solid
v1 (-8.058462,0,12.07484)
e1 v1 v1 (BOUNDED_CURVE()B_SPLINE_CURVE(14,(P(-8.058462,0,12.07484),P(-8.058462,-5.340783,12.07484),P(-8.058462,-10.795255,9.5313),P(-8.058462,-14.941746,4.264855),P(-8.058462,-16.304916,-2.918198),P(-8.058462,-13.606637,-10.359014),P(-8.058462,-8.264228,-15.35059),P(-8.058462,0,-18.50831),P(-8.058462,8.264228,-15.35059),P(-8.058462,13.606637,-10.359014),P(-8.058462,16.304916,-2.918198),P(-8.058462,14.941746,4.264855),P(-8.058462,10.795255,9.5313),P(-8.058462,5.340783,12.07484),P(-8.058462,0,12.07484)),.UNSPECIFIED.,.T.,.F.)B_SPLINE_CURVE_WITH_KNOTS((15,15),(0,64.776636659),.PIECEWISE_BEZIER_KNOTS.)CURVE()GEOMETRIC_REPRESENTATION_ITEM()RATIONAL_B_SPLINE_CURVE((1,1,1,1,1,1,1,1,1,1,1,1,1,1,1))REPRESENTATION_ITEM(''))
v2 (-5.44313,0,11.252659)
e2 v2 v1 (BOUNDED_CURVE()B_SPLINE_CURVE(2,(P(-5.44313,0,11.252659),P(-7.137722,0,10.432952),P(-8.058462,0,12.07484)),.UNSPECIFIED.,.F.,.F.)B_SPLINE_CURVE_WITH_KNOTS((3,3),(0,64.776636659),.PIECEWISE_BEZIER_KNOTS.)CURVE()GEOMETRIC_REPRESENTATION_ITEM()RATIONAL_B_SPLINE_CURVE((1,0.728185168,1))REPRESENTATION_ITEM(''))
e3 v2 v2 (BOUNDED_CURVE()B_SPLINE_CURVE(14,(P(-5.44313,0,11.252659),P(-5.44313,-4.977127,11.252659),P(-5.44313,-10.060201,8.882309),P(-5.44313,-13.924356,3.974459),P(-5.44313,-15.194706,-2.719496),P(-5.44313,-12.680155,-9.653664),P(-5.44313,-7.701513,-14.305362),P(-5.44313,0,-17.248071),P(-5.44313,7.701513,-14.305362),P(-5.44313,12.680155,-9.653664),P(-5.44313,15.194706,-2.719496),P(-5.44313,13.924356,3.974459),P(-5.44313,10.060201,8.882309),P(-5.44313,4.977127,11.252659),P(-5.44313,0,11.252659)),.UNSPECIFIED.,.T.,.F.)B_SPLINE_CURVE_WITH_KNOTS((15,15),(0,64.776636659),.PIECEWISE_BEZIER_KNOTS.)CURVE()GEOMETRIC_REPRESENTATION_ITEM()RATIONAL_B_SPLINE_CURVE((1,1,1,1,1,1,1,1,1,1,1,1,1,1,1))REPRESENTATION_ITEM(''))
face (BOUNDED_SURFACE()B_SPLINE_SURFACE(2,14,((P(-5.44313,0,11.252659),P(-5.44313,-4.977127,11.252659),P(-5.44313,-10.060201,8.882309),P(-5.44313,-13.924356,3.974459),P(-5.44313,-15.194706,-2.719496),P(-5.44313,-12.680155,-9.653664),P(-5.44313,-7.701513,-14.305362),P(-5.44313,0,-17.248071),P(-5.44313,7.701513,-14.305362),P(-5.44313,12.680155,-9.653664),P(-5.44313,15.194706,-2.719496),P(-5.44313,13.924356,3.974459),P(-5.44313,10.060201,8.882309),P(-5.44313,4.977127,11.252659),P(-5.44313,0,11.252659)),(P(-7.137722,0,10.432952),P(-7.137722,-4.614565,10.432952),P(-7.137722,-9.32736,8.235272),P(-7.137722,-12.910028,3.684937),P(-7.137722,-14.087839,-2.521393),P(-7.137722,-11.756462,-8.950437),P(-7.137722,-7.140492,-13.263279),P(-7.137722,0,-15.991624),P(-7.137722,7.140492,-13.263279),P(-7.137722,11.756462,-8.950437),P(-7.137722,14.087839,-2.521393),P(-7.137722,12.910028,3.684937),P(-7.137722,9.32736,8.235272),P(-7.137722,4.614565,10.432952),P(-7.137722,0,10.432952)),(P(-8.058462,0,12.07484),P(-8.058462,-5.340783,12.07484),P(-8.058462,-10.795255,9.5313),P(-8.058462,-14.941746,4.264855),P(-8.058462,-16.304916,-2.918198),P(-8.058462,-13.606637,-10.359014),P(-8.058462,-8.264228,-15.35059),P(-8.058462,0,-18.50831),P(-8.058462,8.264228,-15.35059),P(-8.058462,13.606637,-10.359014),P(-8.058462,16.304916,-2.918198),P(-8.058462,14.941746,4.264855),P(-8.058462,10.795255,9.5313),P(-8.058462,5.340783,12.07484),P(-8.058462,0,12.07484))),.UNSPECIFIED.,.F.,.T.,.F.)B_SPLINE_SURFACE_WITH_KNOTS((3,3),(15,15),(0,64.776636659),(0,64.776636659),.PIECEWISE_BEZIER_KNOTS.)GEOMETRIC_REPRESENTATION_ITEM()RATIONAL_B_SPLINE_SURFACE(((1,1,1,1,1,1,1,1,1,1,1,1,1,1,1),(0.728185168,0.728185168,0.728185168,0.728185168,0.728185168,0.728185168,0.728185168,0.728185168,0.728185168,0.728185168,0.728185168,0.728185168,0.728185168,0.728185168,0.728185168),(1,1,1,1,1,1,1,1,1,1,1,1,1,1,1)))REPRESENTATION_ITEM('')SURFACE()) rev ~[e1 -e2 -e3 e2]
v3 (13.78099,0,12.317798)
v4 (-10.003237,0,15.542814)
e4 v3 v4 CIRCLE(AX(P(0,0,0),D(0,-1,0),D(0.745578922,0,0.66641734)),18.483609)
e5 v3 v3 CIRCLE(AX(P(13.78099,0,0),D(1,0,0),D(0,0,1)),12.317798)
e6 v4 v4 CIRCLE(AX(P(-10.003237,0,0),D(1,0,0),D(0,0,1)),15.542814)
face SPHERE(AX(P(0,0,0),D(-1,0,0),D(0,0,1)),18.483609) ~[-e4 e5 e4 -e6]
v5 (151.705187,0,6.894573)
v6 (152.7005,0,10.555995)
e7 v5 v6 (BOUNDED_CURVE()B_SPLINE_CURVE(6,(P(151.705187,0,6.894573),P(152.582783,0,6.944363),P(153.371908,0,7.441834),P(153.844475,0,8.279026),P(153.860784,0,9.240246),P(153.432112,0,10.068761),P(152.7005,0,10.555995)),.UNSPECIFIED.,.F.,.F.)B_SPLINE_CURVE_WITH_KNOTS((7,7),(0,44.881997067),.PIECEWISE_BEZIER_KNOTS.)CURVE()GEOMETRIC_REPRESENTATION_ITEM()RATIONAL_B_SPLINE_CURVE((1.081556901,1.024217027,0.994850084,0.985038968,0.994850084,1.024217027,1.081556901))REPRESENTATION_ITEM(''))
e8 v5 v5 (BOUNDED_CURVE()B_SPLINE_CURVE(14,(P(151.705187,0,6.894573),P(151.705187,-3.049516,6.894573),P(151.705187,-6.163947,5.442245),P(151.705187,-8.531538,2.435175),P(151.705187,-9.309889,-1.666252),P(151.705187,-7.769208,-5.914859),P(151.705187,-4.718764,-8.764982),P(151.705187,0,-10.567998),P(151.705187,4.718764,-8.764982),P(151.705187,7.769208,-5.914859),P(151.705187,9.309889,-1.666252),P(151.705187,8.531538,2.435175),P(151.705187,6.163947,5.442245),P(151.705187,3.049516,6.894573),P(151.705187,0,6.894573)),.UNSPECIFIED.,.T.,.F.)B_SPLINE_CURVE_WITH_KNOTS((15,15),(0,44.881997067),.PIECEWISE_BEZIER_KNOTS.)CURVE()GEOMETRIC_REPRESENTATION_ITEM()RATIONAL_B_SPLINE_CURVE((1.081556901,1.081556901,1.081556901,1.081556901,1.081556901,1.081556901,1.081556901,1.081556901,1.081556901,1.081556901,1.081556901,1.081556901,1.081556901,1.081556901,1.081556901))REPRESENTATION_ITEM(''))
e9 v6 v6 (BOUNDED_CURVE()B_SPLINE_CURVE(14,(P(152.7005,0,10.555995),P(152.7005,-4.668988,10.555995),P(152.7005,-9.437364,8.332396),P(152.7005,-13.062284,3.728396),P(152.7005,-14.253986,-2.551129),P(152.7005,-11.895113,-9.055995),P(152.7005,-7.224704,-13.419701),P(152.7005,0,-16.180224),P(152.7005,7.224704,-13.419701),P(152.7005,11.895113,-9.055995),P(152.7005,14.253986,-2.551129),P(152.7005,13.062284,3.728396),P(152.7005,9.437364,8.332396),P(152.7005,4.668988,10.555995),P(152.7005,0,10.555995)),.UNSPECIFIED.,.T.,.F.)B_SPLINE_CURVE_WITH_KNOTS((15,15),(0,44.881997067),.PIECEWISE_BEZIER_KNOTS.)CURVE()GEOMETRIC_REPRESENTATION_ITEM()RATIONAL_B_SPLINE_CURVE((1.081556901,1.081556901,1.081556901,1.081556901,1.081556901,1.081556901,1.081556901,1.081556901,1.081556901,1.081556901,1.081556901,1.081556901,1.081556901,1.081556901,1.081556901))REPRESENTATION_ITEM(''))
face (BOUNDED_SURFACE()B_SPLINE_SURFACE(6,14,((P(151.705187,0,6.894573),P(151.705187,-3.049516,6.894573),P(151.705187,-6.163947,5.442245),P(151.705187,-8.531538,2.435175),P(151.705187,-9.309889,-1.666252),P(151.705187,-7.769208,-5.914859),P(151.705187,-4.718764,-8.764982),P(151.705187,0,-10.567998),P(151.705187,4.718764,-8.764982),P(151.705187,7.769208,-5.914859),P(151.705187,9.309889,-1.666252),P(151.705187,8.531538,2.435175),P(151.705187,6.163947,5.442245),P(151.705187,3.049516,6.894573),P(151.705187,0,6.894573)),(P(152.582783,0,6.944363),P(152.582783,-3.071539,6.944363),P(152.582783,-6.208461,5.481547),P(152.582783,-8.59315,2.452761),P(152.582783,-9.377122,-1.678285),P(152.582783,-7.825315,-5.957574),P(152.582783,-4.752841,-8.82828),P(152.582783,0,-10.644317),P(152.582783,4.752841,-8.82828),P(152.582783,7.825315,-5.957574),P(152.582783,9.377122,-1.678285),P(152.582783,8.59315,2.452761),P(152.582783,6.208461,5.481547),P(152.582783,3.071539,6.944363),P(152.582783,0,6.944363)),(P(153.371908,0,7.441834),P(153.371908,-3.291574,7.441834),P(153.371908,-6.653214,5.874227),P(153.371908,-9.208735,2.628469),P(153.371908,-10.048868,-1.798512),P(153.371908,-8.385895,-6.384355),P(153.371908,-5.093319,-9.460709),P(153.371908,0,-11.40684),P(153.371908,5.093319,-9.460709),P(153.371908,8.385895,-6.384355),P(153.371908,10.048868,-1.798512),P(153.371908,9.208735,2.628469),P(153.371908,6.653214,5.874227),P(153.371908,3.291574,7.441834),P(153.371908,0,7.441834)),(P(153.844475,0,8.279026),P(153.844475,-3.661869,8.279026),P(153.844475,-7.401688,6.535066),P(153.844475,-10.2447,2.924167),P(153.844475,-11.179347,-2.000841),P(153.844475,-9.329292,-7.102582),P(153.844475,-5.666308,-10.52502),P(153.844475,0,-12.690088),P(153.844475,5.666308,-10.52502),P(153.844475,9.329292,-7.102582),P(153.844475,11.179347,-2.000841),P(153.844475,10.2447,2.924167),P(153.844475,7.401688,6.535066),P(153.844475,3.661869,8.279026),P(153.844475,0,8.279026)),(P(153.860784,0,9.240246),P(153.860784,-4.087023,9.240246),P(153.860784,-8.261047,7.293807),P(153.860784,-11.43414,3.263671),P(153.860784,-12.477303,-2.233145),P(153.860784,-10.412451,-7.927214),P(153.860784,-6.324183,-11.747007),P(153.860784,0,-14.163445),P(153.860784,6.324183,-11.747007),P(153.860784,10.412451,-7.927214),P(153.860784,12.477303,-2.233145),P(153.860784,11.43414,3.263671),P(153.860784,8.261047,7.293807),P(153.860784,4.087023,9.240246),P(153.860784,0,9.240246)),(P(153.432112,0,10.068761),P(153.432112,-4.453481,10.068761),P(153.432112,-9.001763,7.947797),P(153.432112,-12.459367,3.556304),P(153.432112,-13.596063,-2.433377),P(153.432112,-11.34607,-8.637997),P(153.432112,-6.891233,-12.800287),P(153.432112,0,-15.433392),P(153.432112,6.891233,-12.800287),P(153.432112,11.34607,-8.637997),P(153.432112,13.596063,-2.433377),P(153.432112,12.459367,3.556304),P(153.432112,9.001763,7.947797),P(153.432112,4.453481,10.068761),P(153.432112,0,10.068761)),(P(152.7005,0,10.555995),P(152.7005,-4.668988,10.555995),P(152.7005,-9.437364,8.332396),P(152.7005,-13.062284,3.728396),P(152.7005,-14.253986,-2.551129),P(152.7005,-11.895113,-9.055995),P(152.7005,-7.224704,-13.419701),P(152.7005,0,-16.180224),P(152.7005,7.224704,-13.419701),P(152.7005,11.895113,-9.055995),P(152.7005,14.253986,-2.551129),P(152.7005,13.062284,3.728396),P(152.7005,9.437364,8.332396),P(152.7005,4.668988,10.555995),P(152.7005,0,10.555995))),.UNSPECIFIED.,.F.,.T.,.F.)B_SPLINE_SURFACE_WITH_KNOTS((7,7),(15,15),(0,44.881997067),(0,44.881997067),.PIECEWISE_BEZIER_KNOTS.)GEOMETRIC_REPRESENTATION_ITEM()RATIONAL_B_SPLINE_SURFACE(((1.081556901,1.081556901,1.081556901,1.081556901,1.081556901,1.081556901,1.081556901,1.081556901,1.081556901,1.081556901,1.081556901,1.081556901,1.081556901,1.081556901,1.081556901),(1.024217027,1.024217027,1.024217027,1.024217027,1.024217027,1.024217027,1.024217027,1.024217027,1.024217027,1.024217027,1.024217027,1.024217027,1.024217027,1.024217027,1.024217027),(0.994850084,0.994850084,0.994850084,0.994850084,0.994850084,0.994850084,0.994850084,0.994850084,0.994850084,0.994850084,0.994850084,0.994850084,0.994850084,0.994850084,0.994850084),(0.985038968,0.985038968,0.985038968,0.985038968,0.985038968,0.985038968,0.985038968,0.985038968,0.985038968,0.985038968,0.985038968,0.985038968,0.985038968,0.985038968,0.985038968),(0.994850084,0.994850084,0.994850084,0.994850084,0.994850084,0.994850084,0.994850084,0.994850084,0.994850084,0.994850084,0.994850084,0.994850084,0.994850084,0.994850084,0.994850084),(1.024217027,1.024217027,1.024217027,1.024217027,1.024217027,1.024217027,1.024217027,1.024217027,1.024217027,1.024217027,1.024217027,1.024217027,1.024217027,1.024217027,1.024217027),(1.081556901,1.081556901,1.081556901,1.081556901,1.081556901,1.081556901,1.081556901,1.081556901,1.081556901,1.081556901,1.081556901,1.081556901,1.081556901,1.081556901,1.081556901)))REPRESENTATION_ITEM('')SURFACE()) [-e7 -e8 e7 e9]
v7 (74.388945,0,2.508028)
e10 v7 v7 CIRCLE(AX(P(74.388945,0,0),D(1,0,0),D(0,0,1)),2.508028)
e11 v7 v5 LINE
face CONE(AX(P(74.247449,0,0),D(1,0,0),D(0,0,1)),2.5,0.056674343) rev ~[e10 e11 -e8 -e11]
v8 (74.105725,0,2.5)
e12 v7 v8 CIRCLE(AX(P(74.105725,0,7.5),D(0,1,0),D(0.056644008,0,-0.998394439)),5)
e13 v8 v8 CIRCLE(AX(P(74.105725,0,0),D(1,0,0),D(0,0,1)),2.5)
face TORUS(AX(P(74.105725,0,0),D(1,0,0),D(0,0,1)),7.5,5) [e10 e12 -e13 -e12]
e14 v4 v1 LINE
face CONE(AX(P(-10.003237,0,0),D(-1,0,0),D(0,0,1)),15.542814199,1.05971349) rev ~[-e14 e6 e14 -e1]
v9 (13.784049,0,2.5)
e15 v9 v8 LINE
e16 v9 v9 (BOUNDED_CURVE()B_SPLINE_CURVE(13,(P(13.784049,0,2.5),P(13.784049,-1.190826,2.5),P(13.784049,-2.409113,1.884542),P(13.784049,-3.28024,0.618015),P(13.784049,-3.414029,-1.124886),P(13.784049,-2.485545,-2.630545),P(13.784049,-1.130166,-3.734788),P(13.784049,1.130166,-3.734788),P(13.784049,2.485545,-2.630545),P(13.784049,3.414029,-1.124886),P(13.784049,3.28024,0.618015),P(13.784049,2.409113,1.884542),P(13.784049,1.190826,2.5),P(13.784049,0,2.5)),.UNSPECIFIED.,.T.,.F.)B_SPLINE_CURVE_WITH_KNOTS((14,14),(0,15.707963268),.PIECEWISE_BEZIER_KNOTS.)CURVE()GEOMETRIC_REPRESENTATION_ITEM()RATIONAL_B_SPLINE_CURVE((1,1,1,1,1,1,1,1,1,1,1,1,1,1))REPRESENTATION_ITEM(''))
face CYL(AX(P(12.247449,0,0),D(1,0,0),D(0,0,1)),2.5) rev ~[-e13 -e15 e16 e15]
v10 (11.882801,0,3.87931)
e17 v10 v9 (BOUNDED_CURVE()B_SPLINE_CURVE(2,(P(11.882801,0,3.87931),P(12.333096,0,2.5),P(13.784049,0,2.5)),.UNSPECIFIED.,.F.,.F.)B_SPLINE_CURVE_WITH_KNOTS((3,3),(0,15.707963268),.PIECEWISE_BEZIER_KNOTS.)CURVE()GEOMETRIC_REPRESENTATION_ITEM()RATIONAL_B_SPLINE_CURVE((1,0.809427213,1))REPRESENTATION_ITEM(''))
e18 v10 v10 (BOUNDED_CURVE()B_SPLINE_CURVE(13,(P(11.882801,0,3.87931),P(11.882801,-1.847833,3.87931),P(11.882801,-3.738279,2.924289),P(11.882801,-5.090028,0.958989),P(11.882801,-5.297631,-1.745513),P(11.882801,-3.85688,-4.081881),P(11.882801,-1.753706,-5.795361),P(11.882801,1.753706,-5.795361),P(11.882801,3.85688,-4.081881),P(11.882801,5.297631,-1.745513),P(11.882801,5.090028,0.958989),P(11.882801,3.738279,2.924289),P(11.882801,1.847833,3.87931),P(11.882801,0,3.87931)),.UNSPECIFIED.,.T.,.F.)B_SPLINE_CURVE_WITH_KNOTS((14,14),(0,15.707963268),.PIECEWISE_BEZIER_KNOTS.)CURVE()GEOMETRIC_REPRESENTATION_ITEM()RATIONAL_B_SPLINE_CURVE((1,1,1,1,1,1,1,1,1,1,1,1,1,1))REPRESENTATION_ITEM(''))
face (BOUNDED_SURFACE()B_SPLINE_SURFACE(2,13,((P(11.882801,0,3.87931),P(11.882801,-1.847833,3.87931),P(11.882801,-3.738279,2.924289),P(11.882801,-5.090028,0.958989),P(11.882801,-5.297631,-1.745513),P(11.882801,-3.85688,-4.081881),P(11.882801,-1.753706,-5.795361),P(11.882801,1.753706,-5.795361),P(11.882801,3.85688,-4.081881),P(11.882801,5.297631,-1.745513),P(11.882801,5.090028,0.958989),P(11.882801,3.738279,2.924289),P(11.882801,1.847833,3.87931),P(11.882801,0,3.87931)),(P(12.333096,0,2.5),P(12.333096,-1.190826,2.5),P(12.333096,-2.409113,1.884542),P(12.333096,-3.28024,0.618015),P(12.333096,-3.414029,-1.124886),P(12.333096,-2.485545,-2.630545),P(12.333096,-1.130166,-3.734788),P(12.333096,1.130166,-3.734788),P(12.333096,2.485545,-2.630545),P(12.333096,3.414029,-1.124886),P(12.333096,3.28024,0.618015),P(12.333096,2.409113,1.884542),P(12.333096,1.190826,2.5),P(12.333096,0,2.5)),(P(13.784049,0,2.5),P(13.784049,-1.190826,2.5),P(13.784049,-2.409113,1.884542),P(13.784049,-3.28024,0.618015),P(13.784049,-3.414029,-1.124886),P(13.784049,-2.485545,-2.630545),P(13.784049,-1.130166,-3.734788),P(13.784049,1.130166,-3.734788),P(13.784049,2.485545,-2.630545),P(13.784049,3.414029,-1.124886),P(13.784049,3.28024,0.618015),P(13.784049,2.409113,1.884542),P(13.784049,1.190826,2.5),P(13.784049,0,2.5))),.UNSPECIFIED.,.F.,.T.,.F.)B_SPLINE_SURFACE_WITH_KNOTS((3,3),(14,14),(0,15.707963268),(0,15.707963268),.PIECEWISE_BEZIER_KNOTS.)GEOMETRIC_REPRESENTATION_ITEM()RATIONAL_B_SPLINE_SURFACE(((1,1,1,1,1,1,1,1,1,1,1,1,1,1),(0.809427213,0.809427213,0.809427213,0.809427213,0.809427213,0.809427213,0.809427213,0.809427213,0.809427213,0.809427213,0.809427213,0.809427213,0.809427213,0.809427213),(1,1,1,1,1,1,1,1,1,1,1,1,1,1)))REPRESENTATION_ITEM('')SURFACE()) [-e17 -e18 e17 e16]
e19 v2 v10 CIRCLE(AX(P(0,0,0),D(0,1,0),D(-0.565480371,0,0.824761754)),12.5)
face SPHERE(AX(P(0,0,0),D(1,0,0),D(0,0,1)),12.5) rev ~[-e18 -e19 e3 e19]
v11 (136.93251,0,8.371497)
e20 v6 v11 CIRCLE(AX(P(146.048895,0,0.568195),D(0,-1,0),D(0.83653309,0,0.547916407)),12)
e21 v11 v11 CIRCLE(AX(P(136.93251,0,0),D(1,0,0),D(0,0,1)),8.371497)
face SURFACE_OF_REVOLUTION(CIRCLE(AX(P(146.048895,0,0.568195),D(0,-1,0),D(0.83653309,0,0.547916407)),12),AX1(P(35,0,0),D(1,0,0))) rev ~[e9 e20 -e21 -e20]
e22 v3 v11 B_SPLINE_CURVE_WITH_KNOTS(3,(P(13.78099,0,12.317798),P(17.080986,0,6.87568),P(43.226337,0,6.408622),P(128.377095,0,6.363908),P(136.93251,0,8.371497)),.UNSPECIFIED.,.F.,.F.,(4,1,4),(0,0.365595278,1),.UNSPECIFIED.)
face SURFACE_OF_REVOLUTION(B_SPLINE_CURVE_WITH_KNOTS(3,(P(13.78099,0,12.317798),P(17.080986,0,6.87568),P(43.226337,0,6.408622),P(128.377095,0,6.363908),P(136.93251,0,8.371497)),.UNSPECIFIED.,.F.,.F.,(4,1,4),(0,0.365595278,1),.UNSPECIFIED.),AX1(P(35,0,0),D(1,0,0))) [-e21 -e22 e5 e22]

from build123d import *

# Parameters (mm, degrees)
F2_R = 2


# Not quite as in the source:
# - a fillet or chamfer that OpenCascade refuses, or shapes differently, is made with other operations: its cross-section is extruded or revolved along the edge and cut away or added


with BuildPart() as f1:
    # F0 (on Front) → F1 (revolve)
    with BuildSketch(Plane.XZ):
        with BuildLine():
            ThreePointArc((-7.0685046336, 10.3095219212), (4.6853520259, 11.5886788028), (12.2474487139, 2.5))
            Line((12.2474487139, 2.5), (74.2474487139, 2.5))
            Line((74.2474487139, 2.5), (156.0872918181, 7.1431916891))
            ThreePointArc((156.0872918181, 7.1431916891), (146.8168208834, 12.5435983185), (136.9325101955, 8.371497488))
            add(Edge.make_bspline(
                [(13.7809895682, 12.3177978136), (17.0809857804, 6.8756798123), (43.2263367393, 6.4086219424), (128.3770948763, 6.3639083958), (136.9325101955, 8.371497488)],
                knots=[0, 0, 0, 0, 0.3655952784, 1, 1, 1, 1], degree=3))
            ThreePointArc((13.7809895682, 12.3177978136), (2.4835532955, 18.3159979112), (-10.003236638, 15.5428141988))
            Line((-10.003236638, 15.5428141988), (-7.0685046336, 10.3095219212))
        make_face()
    revolve(axis=Axis((35, 0, 0), (1, 0, 0)))

    # F2
    f2_edges = [f1.edges().sort_by_distance(p)[0] for p in [
        (156.087292, 0, -7.143192),
        (-7.068505, 0, -10.309522),
        (12.247449, 0, -2.5),
    ]]
    fillet(f2_edges, radius=F2_R)

    # F3: fillet of radius 5 on 1 edges, made by hand

    # F3_s1 → F3_t2 (revolve, cut)
    with BuildSketch(Plane.XZ):
        with BuildLine():
            ThreePointArc((74.3889449619, 2.5080278038), (74.247391816, 2.5020073539), (74.1057249198, 2.5))
            Line((74.1057249198, 2.5), (74.1057249198, 2.4))
            Line((74.1057249198, 2.4), (74.2502831898, 2.4))
            Line((74.2502831898, 2.4), (74.3946093628, 2.4081883599))
            Line((74.3946093628, 2.4081883599), (74.3889449619, 2.5080278038))
        make_face()
    revolve(axis=Axis((74.2474487139, 0, 0), (1, 0, 0)), mode=Mode.SUBTRACT)


solid = f1.part
